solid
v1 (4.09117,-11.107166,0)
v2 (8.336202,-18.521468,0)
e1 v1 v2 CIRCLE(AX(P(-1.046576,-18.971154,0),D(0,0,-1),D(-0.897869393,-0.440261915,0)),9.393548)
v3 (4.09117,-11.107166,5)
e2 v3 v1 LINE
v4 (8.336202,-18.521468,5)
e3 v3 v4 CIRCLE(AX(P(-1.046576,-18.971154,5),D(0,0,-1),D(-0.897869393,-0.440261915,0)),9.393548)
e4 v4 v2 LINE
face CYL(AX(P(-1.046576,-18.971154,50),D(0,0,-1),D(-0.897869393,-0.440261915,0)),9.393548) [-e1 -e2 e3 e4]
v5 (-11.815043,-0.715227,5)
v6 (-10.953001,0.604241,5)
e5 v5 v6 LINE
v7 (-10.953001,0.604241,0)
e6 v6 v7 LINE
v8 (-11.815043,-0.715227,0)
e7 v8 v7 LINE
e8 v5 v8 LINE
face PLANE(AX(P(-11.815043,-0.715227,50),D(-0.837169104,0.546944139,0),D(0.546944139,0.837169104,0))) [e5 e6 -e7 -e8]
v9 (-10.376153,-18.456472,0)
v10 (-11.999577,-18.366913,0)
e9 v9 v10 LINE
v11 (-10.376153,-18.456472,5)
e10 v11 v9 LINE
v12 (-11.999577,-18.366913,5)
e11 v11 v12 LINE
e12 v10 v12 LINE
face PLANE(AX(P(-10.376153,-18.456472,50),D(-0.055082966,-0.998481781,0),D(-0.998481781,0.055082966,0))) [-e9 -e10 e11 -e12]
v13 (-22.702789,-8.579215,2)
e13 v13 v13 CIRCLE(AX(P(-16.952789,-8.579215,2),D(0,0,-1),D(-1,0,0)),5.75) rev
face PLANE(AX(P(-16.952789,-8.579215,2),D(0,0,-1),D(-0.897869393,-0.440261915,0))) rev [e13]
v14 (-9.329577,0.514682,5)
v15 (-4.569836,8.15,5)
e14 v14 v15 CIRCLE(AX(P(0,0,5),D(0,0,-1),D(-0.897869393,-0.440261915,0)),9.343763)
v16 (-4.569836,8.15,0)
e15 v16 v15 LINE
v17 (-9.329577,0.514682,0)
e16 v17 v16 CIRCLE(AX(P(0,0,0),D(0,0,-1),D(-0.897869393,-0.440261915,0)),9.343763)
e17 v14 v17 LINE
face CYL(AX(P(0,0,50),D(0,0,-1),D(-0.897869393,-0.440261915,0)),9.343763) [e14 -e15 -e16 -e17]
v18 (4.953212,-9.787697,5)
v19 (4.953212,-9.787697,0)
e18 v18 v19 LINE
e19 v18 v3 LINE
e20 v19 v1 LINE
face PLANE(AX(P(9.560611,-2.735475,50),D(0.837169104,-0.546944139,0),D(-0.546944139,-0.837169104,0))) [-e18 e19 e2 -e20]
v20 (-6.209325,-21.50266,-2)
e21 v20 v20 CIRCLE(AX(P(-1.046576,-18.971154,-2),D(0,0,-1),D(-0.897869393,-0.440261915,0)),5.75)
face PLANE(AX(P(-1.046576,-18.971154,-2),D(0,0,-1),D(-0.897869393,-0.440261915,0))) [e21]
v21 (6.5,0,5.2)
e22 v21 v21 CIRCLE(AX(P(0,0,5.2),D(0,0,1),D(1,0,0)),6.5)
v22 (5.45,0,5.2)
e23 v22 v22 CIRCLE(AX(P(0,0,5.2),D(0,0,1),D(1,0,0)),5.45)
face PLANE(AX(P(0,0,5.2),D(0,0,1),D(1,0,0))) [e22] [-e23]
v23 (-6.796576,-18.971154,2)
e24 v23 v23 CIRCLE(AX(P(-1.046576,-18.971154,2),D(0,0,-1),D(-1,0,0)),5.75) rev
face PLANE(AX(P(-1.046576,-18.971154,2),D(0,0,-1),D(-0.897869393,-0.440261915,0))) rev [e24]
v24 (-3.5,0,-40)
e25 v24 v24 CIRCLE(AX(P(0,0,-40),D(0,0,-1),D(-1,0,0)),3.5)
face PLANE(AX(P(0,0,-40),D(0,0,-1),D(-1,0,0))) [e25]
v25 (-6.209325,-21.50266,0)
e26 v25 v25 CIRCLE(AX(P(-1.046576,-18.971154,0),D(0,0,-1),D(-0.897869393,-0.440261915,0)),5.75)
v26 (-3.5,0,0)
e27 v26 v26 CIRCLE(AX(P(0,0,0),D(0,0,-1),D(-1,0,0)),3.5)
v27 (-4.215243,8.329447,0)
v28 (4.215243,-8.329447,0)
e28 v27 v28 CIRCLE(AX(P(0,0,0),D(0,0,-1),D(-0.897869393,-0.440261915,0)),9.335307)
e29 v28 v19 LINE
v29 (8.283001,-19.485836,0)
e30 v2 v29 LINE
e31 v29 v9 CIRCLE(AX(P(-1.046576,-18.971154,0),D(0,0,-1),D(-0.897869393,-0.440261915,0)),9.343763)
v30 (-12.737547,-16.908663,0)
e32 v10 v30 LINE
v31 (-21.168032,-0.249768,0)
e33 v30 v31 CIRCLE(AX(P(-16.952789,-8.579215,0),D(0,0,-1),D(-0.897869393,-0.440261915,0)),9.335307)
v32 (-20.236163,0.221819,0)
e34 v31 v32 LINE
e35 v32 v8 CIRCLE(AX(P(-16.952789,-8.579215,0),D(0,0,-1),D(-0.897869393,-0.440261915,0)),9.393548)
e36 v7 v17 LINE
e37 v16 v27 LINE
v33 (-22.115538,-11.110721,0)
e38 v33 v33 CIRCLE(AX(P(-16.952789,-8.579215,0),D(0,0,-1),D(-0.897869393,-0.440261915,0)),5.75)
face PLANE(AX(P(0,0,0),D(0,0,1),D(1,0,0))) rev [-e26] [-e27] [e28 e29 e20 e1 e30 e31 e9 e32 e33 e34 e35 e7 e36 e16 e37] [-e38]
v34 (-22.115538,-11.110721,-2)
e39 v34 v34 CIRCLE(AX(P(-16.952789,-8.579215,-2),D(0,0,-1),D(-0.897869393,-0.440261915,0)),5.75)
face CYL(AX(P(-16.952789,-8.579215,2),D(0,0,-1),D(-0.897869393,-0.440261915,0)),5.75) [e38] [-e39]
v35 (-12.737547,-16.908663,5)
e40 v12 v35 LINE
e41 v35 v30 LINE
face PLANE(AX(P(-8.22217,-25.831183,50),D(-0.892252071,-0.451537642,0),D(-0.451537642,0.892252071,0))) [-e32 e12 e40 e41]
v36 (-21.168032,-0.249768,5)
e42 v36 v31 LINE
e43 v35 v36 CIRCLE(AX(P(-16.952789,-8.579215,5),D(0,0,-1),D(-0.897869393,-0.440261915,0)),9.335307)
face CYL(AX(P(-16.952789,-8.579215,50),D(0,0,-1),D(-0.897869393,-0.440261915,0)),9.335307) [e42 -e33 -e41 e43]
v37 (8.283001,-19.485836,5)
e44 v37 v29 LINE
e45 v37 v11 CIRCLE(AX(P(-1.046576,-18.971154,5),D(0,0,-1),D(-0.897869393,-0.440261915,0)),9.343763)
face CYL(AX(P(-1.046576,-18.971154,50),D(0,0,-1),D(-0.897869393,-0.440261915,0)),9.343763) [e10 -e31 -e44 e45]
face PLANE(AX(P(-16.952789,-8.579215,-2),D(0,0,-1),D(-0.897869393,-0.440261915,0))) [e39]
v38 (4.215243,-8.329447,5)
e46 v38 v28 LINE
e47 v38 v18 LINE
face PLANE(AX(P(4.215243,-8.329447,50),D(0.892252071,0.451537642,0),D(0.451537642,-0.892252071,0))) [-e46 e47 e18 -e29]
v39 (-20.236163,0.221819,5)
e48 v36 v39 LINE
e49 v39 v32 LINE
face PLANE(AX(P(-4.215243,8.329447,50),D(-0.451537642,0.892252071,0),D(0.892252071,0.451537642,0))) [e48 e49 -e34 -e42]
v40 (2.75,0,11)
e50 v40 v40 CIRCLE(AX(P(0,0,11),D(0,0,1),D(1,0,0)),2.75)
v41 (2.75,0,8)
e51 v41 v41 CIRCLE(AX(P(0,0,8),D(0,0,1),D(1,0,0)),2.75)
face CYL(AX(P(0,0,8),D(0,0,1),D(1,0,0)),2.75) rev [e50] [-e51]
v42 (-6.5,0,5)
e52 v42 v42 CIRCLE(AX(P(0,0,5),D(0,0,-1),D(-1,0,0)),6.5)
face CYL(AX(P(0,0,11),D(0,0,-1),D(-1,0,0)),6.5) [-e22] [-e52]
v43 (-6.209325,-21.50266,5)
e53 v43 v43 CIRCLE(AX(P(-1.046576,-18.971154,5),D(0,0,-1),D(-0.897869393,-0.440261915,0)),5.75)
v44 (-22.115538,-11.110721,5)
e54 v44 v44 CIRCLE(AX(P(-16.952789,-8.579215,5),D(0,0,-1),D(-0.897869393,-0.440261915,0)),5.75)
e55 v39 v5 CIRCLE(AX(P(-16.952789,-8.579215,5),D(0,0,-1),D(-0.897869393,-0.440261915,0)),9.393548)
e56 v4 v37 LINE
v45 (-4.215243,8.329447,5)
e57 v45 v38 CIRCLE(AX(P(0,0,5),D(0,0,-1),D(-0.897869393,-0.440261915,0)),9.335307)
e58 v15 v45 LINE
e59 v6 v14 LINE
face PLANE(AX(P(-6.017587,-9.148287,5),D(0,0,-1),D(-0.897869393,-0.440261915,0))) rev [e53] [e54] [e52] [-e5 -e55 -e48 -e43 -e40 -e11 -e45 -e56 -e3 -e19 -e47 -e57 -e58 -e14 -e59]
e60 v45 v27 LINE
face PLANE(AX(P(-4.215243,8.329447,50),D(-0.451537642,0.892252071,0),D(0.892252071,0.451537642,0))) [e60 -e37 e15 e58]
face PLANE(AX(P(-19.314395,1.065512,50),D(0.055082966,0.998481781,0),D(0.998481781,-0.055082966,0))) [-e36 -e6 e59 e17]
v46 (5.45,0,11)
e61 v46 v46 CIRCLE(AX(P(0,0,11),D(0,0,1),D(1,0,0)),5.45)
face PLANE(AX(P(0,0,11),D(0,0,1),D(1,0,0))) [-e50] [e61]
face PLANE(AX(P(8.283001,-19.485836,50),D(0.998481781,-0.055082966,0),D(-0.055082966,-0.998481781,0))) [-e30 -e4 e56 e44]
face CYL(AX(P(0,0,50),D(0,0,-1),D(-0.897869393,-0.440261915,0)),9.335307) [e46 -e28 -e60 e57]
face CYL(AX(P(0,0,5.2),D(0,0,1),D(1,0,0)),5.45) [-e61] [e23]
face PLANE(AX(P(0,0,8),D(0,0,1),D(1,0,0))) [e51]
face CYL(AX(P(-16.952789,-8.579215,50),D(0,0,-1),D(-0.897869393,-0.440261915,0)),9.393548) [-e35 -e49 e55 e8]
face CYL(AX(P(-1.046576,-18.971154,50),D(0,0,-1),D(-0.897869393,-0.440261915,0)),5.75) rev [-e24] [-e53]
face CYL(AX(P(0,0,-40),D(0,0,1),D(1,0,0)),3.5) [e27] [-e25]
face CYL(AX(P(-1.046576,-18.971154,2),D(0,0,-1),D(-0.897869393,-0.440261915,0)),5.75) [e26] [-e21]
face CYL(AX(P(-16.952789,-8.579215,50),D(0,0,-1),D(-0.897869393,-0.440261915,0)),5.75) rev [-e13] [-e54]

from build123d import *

# Parameters (mm, degrees)
SKETCH1_R           = 6.5
BOSS_EXTRUDE1_DEPTH = 11
SKETCH2_R           = 2.75
CUT_EXTRUDE1_DEPTH  = 3
SKETCH3_OUTSIDE_W   = 19.284
SKETCH3_OUTSIDE_H   = 19.284
SKETCH3_OUTSIDE_R   = 5.45
CUT_EXTRUDE2_DEPTH  = 5.8
SKETCH4_R           = 3.5
BOSS_EXTRUDE2_DEPTH = 40
JOIN2_OUTLINE_R     = 5.75
JOIN2_OUTLINE_R_2   = 6.5
JOIN2_DEPTH         = 5
JOIN2_START         = -2
JOIN2_2_OUTLINE_R   = 5.75
JOIN2_2_DEPTH       = 4


# Read off the part's stored shape, not the designer's step: Join2
with BuildPart() as part:
    # Sketch1 → Boss-Extrude1 (new body)
    with BuildSketch(Plane.XY):
        Circle(SKETCH1_R)
    extrude(amount=BOSS_EXTRUDE1_DEPTH)

    # Sketch2 → Cut-Extrude1 (cut)
    with BuildSketch(Plane.XY.offset(11)):
        Circle(SKETCH2_R)
    extrude(amount=-CUT_EXTRUDE1_DEPTH, mode=Mode.SUBTRACT)

    # Sketch3 outside → Cut-Extrude2 (cut)
    with BuildSketch(Plane.XY.offset(11)):
        Rectangle(SKETCH3_OUTSIDE_W, SKETCH3_OUTSIDE_H)
        Circle(SKETCH3_OUTSIDE_R, mode=Mode.SUBTRACT)
    extrude(amount=-CUT_EXTRUDE2_DEPTH, mode=Mode.SUBTRACT)

    # Sketch4 → Boss-Extrude2 (add)
    with BuildSketch(Plane(origin=(0, 0, 0), x_dir=(-1, 0, 0), z_dir=(0, 0, -1))):
        Circle(SKETCH4_R)
    extrude(amount=BOSS_EXTRUDE2_DEPTH)

    # Join2 outline → Join2 (add)
    with BuildSketch(Plane.XY):
        with BuildLine():
            Line((4.091169505, -11.107165908), (4.953212207, -9.78769749))
            Line((4.953212207, -9.78769749), (4.215242705, -8.329447379))
            ThreePointArc((4.215242705, -8.329447379), (8.329447379, 4.215242705), (-4.215242705, 8.329447379))
            Line((-4.215242705, 8.329447379), (-4.56983635, 8.149999907))
            ThreePointArc((-4.56983635, 8.149999907), (-7.929245952, 4.942970907), (-9.329576894, 0.51468217))
            Line((-9.329576894, 0.51468217), (-10.953000775, 0.604241143))
            Line((-10.953000775, 0.604241143), (-11.815043478, -0.715227275))
            ThreePointArc((-11.815043478, -0.715227275), (-15.913949613, 0.756712749), (-20.236162848, 0.221818664))
            Line((-20.236162848, 0.221818664), (-21.168032047, -0.249767825))
            ThreePointArc((-21.168032047, -0.249767825), (-25.282236722, -12.794457909), (-12.737546638, -16.908662583))
            Line((-12.737546638, -16.908662583), (-11.999577135, -18.366912694))
            Line((-11.999577135, -18.366912694), (-10.376153254, -18.456471667))
            ThreePointArc((-10.376153254, -18.456471667), (-1.56125853, -28.300730731), (8.283000534, -19.485836007))
            Line((8.283000534, -19.485836007), (8.336201554, -18.521468017))
            ThreePointArc((8.336201554, -18.521468017), (7.105378721, -14.303781228), (4.091169505, -11.107165908))
        make_face()
        with Locations((-1.04657636, -18.971153837)):
            Circle(JOIN2_OUTLINE_R, mode=Mode.SUBTRACT)
        with Locations((-16.952789342, -8.579215204)):
            Circle(JOIN2_OUTLINE_R, mode=Mode.SUBTRACT)
        Circle(JOIN2_OUTLINE_R_2, mode=Mode.SUBTRACT)
    extrude(amount=JOIN2_DEPTH)

    # Join2 2 outline → Join2 2 (add)
    with BuildSketch(Plane.XY.offset(JOIN2_START)):
        with Locations((-1.04657636, -18.971153837)):
            Circle(JOIN2_2_OUTLINE_R)
        with Locations((-16.952789342, -8.579215204)):
            Circle(JOIN2_2_OUTLINE_R)
    extrude(amount=JOIN2_2_DEPTH)


solid = part.part
